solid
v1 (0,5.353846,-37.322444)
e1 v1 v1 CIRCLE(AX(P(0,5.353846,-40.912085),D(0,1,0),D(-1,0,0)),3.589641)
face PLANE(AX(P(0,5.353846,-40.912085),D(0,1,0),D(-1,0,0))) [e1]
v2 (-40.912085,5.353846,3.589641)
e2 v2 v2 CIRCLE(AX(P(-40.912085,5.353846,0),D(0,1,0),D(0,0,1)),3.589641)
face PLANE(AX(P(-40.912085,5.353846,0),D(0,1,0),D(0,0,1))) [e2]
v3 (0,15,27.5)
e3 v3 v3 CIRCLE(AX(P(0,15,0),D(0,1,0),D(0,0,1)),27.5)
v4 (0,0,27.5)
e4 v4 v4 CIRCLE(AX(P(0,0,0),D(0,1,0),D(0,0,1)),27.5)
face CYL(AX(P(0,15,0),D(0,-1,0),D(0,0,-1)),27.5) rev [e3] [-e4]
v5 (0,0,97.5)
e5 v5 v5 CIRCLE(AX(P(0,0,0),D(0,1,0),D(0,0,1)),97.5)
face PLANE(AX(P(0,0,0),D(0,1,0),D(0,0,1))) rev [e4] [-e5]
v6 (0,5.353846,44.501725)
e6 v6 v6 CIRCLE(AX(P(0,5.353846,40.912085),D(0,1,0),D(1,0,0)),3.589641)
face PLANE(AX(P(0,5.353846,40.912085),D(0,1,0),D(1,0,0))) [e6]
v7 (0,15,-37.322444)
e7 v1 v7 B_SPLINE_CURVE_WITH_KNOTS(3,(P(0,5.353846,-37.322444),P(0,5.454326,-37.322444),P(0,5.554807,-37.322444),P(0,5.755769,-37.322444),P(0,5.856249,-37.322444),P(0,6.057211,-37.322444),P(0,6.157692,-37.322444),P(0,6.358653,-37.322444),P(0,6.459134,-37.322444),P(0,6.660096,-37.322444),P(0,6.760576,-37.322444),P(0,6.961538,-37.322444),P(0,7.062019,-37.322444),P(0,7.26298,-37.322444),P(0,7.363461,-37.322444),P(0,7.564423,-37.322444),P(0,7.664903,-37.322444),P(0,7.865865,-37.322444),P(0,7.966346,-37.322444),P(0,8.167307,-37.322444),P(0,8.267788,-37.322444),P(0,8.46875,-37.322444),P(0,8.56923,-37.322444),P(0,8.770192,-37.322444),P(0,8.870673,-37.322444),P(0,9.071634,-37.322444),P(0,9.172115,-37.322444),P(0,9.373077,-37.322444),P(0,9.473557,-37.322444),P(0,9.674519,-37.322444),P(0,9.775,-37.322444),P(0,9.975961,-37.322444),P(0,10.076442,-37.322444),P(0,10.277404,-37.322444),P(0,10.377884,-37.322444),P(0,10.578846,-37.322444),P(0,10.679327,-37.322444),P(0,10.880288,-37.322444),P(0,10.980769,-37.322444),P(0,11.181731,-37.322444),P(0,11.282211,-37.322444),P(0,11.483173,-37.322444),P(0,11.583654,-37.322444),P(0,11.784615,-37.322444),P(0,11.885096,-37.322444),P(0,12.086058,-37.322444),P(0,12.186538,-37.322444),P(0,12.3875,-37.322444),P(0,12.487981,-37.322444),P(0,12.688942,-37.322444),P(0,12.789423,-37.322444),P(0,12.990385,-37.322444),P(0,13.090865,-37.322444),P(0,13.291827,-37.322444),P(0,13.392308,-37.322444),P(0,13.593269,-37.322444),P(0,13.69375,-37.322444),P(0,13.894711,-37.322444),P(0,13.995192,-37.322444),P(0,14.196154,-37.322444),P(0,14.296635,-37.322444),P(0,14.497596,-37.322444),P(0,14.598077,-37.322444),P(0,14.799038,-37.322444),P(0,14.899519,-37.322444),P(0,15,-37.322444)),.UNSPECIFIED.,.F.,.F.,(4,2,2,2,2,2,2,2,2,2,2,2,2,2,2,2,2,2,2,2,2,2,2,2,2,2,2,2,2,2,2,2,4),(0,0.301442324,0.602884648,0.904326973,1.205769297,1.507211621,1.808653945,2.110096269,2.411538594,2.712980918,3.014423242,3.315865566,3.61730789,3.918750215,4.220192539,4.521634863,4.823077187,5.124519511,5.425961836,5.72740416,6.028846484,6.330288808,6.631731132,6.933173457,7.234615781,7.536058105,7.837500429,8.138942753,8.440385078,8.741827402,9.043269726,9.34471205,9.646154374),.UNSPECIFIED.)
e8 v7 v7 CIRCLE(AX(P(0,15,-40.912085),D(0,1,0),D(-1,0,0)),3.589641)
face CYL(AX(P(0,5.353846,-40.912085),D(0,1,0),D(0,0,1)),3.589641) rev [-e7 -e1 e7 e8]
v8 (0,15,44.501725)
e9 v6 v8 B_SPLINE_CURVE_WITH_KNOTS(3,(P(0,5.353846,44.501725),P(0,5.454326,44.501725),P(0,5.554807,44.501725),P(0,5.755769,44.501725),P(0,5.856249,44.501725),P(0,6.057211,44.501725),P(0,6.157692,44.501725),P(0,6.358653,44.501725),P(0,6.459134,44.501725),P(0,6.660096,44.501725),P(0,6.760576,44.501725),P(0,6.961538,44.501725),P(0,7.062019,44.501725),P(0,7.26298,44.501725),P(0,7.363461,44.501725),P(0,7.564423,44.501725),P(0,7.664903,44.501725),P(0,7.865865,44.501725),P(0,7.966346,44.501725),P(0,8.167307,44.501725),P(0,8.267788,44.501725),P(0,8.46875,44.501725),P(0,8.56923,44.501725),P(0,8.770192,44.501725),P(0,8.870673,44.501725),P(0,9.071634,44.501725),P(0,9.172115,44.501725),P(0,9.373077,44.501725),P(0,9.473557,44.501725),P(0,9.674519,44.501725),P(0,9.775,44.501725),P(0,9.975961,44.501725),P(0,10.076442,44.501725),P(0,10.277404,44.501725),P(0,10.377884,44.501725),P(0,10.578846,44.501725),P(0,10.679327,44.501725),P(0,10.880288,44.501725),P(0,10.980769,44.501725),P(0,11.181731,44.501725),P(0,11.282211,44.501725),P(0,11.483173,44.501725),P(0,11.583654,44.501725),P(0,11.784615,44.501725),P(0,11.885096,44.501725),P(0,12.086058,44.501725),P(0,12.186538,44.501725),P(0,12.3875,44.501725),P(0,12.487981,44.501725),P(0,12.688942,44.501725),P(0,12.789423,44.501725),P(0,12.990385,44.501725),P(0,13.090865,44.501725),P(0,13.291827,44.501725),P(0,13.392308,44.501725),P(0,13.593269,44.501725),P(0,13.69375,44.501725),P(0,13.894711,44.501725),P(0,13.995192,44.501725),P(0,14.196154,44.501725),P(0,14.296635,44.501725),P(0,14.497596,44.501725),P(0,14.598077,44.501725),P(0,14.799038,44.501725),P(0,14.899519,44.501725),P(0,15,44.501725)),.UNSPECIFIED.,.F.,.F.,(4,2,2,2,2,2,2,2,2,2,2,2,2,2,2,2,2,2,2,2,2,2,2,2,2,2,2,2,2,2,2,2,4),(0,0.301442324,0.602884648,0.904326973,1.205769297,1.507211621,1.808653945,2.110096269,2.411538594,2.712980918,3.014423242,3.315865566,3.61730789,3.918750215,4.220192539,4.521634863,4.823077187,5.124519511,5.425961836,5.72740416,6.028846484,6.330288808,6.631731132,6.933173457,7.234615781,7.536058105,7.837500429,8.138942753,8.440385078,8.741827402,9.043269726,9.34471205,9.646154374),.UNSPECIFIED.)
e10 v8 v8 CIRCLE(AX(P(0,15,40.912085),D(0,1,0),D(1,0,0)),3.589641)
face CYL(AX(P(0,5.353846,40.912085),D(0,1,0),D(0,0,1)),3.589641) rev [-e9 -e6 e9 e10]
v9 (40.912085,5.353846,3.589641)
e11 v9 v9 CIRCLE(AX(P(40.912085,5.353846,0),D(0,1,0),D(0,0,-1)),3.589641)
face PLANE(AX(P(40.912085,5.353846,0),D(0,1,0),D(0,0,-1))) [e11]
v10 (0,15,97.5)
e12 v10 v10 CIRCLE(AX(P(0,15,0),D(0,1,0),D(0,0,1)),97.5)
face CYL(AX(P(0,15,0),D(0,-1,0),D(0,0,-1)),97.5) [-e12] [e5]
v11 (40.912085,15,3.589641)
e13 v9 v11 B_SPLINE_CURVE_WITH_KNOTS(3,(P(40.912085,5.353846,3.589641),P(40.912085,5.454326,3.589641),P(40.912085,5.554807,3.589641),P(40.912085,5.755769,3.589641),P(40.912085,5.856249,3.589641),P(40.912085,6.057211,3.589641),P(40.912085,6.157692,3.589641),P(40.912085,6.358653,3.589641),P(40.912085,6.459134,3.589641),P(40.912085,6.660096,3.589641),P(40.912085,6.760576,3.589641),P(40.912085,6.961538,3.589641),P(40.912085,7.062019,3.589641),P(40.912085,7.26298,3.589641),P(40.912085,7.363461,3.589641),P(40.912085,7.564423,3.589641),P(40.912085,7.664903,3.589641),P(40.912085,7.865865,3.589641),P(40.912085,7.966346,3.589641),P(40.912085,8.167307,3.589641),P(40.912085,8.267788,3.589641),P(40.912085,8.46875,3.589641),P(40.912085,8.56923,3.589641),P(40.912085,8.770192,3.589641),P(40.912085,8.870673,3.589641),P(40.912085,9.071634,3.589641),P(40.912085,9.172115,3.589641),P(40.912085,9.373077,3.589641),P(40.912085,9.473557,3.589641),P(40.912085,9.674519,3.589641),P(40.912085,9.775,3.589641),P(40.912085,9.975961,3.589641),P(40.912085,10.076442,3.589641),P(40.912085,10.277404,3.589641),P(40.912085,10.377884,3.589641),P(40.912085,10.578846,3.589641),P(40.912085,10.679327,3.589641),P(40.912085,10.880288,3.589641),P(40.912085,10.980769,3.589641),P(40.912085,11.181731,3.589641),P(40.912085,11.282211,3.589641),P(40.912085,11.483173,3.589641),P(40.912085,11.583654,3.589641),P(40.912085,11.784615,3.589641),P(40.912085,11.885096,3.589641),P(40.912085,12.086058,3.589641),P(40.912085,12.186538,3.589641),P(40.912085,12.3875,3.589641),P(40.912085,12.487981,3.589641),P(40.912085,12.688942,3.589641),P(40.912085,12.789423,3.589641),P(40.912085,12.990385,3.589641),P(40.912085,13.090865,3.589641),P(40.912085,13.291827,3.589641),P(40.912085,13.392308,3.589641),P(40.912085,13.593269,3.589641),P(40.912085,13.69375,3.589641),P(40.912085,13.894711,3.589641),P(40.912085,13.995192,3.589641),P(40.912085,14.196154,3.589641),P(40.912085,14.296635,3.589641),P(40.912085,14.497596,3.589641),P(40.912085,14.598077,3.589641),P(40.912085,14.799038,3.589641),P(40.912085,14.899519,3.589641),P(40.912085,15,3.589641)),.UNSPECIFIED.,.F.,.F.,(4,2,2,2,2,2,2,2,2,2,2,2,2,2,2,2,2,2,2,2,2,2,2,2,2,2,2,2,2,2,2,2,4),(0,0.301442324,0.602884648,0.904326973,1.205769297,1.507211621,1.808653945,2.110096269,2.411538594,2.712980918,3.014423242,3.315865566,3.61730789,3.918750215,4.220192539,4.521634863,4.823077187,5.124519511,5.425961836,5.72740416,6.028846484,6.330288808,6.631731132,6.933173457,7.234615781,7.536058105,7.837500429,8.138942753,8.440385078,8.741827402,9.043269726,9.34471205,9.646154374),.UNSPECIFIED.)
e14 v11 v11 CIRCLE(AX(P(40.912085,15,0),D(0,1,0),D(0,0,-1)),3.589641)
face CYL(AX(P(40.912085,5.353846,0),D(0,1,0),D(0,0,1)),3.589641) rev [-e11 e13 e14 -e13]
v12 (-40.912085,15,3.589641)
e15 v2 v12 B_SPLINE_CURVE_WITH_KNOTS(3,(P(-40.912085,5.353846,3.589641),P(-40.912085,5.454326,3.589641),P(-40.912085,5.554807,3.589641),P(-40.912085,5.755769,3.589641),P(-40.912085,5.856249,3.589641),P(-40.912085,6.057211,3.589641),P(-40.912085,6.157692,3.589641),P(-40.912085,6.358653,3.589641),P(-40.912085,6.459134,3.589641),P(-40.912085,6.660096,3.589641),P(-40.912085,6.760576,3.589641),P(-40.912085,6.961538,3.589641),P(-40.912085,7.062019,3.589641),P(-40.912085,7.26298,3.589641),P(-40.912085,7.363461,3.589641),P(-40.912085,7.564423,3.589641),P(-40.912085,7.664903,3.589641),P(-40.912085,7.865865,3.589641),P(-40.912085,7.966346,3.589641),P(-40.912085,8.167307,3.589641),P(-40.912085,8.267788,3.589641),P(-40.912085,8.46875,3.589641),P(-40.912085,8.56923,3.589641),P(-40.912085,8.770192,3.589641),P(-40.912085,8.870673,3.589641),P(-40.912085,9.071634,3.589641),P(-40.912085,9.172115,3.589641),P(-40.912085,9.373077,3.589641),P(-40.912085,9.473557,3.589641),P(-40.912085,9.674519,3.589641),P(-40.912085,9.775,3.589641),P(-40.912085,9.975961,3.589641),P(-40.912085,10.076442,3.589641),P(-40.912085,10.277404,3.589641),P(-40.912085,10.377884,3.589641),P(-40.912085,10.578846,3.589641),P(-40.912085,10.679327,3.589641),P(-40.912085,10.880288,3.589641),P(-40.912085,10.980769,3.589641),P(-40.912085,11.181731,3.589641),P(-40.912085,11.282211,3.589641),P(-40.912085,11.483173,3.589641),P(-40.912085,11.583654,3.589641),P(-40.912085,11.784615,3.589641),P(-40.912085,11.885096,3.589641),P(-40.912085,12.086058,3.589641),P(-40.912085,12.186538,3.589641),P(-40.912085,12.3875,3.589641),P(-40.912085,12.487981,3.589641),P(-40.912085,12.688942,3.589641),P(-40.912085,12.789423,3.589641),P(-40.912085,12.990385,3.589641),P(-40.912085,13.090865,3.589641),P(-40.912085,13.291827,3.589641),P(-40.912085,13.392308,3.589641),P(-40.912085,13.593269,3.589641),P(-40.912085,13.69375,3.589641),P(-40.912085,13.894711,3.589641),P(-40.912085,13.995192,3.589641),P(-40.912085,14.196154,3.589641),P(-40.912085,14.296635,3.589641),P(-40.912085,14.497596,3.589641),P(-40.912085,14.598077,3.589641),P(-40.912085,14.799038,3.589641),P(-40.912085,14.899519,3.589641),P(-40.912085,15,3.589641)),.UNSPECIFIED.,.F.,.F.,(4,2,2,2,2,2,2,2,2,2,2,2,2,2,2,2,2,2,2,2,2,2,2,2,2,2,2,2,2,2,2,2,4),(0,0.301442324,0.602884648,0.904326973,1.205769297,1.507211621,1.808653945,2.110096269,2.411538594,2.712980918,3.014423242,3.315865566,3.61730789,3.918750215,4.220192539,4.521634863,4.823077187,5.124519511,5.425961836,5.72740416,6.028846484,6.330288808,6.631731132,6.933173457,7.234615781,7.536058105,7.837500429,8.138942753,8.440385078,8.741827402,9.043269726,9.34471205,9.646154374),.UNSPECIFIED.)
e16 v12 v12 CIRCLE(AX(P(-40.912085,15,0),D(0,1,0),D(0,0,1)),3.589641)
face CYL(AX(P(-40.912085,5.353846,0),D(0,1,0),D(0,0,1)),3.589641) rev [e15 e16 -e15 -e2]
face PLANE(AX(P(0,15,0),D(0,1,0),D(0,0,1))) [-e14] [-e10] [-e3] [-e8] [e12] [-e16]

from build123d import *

# Parameters (mm, degrees)
SKETCH1_R           = 97.5
BOSS_EXTRUDE1_DEPTH = 15
SKETCH2_R           = 27.5
CUT_EXTRUDE1_DEPTH  = 139.699315067
SKETCH3_R           = 3.589640567
CUT_EXTRUDE2_DEPTH  = 9.646154374
CIRPATTERN1_COUNT   = 4


with BuildPart() as part:
    # Sketch1 → Boss-Extrude1 (new body)
    with BuildSketch(Plane(origin=(0, 0, 0), x_dir=(1, 0, 0), z_dir=(0, 1, 0))):
        Circle(SKETCH1_R)
    extrude(amount=BOSS_EXTRUDE1_DEPTH)

    # Sketch2 → Cut-Extrude1 (cut, through all)
    with BuildSketch(Plane(origin=(0, 0, 0), x_dir=(1, 0, 0), z_dir=(0, 1, 0))):
        Circle(SKETCH2_R)
    extrude(amount=CUT_EXTRUDE1_DEPTH, mode=Mode.SUBTRACT)

    # Sketch3 → Cut-Extrude2 (cut)
    with BuildSketch(Plane(origin=(0, 15, 0), x_dir=(1, 0, 0), z_dir=(0, 1, 0))):
        with Locations((-40.912084687, 0)):
            Circle(SKETCH3_R)
    cut_extrude2 = extrude(amount=-CUT_EXTRUDE2_DEPTH, mode=Mode.SUBTRACT)

    # CirPattern1: Cut-Extrude2 ×4 about axis
    cirpattern1_axis = Axis((0, 0, 0), (0, 1, 0))
    for i in range(1, CIRPATTERN1_COUNT):
        add(cut_extrude2.rotate(cirpattern1_axis, i * 360 / CIRPATTERN1_COUNT), mode=Mode.SUBTRACT)


solid = part.part
